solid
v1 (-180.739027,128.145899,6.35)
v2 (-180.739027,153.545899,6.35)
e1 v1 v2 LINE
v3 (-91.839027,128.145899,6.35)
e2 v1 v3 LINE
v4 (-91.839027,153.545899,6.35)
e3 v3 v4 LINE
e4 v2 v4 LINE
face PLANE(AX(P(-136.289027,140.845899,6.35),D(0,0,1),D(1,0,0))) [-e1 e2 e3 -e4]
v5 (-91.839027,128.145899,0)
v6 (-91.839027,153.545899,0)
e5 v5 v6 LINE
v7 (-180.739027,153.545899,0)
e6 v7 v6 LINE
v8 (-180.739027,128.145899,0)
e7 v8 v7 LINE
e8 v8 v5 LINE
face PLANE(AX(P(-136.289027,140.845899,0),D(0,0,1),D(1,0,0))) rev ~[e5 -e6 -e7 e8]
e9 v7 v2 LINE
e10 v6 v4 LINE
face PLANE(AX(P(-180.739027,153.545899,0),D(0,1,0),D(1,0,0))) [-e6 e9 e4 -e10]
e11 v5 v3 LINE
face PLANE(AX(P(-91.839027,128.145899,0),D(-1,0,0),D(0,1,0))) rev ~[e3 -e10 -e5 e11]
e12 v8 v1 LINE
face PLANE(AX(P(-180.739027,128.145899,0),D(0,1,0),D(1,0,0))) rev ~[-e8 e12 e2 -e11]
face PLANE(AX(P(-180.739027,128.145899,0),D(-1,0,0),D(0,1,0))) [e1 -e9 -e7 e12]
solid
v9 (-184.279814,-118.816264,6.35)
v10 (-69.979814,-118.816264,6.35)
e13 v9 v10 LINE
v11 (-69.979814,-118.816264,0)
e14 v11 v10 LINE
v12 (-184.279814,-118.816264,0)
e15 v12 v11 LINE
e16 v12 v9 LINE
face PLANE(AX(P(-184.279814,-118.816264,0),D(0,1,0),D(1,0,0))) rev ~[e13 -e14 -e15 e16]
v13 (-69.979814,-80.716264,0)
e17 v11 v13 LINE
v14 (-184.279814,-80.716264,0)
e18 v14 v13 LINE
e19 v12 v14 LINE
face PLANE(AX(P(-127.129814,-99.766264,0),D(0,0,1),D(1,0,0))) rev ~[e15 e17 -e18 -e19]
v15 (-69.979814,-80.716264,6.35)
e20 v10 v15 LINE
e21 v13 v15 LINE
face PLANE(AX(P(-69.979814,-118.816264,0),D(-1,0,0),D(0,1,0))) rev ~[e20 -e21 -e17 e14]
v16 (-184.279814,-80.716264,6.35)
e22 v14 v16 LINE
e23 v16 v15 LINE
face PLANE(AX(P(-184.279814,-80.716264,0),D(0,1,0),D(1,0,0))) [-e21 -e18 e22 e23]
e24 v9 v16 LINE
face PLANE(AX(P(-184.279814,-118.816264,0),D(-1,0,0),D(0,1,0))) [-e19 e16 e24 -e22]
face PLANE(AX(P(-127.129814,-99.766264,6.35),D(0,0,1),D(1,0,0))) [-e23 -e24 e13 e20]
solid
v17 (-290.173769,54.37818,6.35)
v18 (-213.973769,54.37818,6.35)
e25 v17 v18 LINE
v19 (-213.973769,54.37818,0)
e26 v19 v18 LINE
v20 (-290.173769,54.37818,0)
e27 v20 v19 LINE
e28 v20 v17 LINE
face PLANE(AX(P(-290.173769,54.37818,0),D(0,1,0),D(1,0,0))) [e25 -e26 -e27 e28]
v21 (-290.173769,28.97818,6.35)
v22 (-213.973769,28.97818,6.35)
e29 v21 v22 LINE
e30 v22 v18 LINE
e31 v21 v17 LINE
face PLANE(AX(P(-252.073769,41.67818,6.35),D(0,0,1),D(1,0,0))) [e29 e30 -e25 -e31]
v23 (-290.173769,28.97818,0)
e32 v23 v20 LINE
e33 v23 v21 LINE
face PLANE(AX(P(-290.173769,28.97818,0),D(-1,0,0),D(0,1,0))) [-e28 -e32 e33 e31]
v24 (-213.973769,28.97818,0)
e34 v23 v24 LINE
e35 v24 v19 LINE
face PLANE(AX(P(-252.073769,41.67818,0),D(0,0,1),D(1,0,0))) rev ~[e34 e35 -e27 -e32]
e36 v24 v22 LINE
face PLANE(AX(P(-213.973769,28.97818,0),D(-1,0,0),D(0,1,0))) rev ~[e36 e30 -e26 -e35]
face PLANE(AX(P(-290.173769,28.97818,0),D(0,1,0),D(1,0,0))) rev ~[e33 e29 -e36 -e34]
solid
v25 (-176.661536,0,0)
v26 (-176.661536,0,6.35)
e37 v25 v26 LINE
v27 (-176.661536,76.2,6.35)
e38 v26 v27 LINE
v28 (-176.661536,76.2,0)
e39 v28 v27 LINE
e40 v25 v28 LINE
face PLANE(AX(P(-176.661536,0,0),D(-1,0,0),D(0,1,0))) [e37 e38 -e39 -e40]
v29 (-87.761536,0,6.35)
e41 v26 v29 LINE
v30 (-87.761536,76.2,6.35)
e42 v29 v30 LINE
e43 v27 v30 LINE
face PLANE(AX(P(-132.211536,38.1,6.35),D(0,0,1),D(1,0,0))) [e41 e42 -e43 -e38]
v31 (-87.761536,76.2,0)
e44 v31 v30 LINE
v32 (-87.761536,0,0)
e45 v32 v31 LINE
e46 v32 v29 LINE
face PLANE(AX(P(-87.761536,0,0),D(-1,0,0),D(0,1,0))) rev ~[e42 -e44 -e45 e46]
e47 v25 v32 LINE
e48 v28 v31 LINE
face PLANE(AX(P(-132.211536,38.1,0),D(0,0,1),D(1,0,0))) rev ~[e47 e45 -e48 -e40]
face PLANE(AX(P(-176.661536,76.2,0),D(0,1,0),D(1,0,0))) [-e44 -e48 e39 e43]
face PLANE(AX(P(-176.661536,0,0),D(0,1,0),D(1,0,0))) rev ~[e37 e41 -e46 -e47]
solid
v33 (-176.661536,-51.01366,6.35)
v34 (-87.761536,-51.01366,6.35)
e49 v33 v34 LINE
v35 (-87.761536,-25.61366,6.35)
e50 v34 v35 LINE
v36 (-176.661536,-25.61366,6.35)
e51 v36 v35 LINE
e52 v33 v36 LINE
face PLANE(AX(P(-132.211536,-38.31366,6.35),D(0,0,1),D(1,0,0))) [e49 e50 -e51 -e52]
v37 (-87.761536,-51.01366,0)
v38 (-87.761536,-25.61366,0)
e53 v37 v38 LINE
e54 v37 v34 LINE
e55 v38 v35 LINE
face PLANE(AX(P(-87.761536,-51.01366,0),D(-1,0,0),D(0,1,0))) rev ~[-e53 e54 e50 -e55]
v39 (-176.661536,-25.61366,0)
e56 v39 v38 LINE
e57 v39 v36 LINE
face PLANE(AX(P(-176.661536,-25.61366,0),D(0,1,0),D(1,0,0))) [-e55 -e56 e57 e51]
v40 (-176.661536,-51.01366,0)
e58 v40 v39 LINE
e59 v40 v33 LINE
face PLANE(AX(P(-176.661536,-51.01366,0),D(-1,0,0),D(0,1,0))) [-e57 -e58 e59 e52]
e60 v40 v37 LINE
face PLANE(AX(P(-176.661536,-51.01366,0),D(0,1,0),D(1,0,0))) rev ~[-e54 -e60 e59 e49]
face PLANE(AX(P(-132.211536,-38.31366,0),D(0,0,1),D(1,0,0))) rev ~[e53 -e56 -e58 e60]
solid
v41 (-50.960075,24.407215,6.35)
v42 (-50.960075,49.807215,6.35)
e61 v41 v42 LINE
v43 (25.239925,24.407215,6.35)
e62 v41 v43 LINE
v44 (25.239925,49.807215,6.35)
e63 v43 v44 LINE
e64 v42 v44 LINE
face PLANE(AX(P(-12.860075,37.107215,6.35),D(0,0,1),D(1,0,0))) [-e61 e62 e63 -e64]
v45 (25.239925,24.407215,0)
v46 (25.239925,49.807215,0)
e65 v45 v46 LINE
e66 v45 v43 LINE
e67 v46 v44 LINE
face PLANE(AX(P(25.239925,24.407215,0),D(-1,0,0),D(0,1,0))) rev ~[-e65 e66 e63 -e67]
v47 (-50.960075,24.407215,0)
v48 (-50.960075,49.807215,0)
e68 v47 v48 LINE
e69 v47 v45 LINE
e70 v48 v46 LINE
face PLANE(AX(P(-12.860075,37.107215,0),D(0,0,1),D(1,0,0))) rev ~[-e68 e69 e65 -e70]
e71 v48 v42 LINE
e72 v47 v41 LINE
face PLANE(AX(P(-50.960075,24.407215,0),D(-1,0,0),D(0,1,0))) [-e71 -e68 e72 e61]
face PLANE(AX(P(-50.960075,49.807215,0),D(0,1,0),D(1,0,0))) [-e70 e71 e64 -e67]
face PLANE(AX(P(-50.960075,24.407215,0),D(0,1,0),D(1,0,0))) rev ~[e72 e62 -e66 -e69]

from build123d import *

# Parameters (mm, degrees)
F1_W     = 76.2
F1_H     = 25.4
F2_DEPTH = 6.35
F1_W_2   = 88.9
F1_H_2   = 76.2
F1_W_3   = 114.3
F1_H_3   = 38.1


# Not quite as in the source:
# - a variable given as a bare number and used for a length is read in inches; the dataset says mm whatever the document's units were


with BuildPart() as f2:
    # F1 (on Top) → F2 (new body)
    with BuildSketch(Plane.XY):
        with Locations((-252.0737689972, 41.6781801403)):
            Rectangle(F1_W, F1_H)
    extrude(amount=F2_DEPTH)


with BuildPart() as f2b:
    # F1 (on Top) → F2, piece 2 (new body)
    with BuildSketch(Plane.XY):
        with Locations((-132.2115360975, 38.1)):
            Rectangle(F1_W_2, F1_H_2)
    extrude(amount=F2_DEPTH)


with BuildPart() as f2c:
    # F1 (on Top) → F2, piece 3 (new body)
    with BuildSketch(Plane.XY):
        with Locations((-136.2890268325, 140.8458990288)):
            Rectangle(F1_W_2, F1_H)
    extrude(amount=F2_DEPTH)


with BuildPart() as f2d:
    # F1 (on Top) → F2, piece 4 (new body)
    with BuildSketch(Plane.XY):
        with Locations((-127.1298143625, -99.7662639737)):
            Rectangle(F1_W_3, F1_H_3)
    extrude(amount=F2_DEPTH)


with BuildPart() as f2e:
    # F1 (on Top) → F2, piece 5 (new body)
    with BuildSketch(Plane.XY):
        with Locations((-132.2115360975, -38.3136596859)):
            Rectangle(F1_W_2, F1_H)
    extrude(amount=F2_DEPTH)


with BuildPart() as f2f:
    # F1 (on Top) → F2, piece 6 (new body)
    with BuildSketch(Plane.XY):
        with Locations((-12.8600751102, 37.1072154164)):
            Rectangle(F1_W, F1_H)
    extrude(amount=F2_DEPTH)


solid = Compound([f2.part, f2b.part, f2c.part, f2d.part, f2e.part, f2f.part])
